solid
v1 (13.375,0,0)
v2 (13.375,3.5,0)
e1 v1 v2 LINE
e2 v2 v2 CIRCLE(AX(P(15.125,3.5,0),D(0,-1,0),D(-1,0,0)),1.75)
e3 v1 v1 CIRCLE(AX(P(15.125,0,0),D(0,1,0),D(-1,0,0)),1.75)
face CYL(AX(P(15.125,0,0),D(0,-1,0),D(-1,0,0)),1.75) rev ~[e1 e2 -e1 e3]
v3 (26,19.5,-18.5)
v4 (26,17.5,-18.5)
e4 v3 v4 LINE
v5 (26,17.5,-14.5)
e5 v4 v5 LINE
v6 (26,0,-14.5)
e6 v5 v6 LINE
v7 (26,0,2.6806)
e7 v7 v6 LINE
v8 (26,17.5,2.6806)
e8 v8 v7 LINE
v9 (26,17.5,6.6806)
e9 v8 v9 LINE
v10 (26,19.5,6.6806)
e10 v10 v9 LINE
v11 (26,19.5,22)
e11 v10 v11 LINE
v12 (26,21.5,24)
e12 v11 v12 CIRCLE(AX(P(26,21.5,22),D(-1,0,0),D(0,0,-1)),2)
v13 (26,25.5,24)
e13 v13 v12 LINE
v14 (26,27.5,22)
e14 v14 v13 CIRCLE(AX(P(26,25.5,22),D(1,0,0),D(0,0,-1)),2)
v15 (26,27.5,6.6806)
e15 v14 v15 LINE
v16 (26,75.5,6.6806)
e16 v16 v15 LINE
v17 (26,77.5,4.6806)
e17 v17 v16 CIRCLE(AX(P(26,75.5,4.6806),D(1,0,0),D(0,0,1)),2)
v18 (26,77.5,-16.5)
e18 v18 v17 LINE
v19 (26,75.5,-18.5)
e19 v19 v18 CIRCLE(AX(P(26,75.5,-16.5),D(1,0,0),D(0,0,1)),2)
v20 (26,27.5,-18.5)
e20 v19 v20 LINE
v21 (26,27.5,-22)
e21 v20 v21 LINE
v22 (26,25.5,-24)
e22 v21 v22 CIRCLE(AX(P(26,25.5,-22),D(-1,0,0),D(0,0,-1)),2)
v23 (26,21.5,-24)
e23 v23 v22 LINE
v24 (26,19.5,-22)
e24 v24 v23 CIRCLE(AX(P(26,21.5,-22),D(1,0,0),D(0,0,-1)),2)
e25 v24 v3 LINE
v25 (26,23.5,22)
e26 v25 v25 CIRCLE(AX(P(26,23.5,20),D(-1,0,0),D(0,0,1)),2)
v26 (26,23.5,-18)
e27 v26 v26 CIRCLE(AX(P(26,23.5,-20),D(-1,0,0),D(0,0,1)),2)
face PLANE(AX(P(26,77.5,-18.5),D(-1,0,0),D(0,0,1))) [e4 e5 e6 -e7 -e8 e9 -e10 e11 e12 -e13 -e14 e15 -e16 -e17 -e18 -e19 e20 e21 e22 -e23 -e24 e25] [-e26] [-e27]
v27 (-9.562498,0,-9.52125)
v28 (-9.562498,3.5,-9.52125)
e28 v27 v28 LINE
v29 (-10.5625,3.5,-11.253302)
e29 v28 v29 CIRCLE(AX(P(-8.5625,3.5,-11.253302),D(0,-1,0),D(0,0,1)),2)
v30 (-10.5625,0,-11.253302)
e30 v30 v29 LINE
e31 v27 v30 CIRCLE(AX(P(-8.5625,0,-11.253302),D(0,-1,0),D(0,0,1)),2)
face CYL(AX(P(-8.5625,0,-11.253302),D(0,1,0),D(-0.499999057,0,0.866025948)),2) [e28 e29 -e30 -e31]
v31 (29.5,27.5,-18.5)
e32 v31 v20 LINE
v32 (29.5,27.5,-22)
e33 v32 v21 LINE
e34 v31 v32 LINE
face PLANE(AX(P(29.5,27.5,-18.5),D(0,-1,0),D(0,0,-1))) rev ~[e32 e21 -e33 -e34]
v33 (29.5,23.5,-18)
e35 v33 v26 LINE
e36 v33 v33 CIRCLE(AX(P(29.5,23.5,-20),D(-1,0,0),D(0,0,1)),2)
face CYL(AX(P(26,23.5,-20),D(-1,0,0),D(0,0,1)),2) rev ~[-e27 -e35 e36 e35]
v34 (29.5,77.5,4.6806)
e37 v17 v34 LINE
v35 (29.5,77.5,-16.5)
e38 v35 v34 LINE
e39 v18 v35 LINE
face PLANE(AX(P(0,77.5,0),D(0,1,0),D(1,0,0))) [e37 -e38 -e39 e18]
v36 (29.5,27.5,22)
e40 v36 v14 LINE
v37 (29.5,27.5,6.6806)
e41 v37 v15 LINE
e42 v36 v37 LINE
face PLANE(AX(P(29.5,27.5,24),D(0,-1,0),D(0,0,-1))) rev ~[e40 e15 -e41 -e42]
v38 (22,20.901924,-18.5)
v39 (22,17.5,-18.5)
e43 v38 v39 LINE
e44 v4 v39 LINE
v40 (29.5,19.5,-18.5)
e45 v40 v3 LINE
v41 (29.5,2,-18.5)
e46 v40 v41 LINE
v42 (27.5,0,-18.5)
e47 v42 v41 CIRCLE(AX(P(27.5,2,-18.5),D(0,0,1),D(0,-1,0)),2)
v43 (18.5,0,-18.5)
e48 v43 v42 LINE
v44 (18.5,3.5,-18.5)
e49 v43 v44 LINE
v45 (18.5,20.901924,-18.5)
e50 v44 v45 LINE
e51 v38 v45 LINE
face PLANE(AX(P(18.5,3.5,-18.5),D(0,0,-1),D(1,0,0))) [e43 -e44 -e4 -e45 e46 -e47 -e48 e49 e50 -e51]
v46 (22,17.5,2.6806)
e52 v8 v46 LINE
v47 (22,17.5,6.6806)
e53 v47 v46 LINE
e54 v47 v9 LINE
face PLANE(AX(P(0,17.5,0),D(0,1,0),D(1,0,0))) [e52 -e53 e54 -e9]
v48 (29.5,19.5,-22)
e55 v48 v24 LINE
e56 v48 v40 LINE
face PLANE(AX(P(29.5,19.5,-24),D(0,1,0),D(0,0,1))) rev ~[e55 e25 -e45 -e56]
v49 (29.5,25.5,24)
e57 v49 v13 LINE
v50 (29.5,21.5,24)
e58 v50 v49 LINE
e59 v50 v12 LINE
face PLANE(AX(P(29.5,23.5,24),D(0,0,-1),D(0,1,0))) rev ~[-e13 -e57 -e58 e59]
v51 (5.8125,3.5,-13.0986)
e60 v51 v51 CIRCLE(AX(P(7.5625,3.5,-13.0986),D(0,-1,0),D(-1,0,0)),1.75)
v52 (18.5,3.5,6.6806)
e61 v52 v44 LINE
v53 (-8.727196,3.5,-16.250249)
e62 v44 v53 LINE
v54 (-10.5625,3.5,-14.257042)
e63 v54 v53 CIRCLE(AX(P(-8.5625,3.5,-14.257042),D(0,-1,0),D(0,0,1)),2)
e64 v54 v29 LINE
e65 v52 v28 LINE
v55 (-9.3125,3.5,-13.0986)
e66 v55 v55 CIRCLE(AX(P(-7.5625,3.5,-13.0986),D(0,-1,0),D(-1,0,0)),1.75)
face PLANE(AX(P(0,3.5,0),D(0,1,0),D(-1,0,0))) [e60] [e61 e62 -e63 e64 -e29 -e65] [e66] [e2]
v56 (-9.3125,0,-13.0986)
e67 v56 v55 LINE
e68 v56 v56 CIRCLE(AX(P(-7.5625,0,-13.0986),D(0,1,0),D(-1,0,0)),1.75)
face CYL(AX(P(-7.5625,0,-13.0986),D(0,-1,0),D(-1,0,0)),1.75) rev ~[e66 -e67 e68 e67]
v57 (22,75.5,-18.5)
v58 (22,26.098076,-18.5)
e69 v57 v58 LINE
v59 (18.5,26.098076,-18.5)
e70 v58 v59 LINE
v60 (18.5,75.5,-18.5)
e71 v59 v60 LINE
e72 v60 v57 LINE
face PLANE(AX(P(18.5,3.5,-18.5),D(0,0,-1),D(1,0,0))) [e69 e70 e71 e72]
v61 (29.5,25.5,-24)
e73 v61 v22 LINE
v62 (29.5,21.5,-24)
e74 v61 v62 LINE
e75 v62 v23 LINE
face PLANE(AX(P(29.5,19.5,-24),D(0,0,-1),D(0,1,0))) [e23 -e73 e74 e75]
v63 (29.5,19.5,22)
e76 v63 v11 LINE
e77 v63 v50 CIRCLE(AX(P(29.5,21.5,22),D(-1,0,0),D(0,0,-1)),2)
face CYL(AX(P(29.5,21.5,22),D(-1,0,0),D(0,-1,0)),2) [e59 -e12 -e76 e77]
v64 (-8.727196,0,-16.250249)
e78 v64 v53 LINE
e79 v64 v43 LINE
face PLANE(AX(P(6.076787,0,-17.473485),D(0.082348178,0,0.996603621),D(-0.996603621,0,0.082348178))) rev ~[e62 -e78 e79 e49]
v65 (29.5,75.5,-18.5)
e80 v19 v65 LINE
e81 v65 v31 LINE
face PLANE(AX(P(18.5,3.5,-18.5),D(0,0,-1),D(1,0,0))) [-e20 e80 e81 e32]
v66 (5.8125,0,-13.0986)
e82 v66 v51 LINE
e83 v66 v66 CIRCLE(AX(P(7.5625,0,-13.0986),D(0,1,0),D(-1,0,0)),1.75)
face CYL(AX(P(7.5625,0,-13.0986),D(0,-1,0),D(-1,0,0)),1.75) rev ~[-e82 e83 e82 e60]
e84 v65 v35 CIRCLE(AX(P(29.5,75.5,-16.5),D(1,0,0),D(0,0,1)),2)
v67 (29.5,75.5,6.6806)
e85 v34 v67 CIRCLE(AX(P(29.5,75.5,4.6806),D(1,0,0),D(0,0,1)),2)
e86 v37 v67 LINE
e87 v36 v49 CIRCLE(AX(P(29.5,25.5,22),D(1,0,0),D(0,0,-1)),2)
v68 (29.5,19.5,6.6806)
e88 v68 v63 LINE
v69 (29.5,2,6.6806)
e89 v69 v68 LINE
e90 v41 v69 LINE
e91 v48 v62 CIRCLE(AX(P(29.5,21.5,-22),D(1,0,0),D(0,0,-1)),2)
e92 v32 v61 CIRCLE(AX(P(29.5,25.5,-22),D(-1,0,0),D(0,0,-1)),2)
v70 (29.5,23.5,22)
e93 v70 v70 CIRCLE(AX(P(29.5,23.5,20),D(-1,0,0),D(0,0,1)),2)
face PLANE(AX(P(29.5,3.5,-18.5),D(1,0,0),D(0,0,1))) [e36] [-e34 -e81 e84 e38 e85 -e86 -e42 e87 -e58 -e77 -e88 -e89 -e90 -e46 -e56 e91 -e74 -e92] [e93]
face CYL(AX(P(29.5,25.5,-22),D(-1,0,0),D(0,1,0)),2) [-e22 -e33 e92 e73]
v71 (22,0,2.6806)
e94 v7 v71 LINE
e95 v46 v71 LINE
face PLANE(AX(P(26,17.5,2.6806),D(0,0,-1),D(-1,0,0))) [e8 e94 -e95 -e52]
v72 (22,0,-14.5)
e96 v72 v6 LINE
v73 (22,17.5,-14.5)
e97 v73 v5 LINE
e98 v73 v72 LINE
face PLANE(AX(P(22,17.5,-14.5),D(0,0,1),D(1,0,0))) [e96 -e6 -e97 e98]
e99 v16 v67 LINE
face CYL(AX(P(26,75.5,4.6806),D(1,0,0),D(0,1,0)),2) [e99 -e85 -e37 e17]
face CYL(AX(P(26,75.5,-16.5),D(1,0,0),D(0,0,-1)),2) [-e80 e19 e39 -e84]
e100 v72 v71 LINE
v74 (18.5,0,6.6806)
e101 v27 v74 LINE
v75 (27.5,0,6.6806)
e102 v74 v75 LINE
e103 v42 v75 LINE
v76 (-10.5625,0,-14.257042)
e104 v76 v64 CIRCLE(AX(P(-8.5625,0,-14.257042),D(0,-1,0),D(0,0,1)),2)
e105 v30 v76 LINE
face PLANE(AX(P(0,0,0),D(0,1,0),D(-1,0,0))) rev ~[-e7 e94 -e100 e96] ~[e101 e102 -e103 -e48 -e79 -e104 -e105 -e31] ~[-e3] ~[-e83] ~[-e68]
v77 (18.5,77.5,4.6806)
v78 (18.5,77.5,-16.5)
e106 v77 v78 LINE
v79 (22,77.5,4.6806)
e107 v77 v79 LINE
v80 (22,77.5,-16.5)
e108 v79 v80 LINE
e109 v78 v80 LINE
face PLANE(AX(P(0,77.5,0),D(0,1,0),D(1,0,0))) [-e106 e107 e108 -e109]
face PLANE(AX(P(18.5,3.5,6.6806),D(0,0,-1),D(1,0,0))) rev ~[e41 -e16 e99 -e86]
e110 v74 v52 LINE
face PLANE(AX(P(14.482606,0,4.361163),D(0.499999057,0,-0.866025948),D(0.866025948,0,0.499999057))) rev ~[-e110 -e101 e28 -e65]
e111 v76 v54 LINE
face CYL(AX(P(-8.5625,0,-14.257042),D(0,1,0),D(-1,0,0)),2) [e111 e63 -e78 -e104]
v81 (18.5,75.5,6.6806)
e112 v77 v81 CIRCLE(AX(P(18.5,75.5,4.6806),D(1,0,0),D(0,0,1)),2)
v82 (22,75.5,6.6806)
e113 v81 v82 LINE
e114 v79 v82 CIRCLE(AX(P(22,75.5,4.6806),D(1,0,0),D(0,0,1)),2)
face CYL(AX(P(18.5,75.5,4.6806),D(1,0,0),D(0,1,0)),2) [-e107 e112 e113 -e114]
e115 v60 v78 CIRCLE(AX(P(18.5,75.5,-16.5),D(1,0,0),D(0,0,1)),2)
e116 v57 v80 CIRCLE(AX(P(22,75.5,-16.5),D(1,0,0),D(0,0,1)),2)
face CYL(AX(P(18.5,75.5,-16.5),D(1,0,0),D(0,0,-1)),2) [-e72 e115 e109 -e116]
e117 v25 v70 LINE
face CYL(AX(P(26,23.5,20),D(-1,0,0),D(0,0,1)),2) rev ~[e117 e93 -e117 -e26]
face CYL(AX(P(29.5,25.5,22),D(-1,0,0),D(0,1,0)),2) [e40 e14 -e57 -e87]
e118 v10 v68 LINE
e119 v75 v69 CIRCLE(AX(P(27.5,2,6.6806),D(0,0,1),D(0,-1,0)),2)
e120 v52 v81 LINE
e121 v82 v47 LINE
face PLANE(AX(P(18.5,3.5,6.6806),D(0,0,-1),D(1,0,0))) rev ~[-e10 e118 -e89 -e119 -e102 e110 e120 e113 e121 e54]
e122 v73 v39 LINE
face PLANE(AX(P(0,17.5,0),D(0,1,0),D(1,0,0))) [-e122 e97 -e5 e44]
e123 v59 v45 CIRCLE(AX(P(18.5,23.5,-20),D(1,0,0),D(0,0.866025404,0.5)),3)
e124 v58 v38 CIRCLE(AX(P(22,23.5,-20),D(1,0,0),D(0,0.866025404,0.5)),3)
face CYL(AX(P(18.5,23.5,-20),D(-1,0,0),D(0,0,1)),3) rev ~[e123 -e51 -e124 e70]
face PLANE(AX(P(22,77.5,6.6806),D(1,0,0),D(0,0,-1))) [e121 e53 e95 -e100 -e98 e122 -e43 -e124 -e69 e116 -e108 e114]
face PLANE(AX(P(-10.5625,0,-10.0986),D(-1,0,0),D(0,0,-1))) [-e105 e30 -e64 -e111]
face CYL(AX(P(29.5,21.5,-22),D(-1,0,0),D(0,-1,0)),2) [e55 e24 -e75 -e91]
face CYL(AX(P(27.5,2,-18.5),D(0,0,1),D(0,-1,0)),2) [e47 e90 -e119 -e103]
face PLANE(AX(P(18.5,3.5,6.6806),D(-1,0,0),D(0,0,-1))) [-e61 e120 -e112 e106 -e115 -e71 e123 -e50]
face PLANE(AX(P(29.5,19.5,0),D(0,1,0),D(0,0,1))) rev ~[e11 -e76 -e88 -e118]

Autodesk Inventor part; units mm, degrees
ref_plane "YZ Plane" through (0, 0, 0) normal (1, 0, 0) x (0, 1, 0)
ref_plane "XZ Plane" through (0, 0, 0) normal (0, 1, 0) x (-1, 0, 0)
ref_plane "XY Plane" through (0, 0, 0) normal (0, 0, 1) x (1, 0, 0)
sketch "Szkic1" plane through (0, 0, 0) normal (0, 1, 0) x (-1, 0, 0)
  circle A0 centre (0, 0) radius 18.5
  circle A1 centre (0, 0) radius 15.125
  line L0 (15.125, 0) -> (7.5625, -13.0986)
  line L1 (7.5625, -13.0986) -> (-7.5625, -13.0986)
  line L2 (-7.5625, -13.0986) -> (-15.125, 0)
  line L3 (-15.125, 0) -> (-7.5625, 13.0986)
  line L4 (-7.5625, 13.0986) -> (7.5625, 13.0986)
  line L5 (7.5625, 13.0986) -> (15.125, 0)
  circle A2 centre (-15.125, 0) radius 1.75
  circle A3 centre (-7.5625, -13.0986) radius 1.75
  circle A4 centre (7.5625, -13.0986) radius 1.75
  line L6 (-18.5, 0) -> (-29.5, 0)
  line L7 (-29.5, 0) -> (-29.5, -18.5)
  line L8 (-29.5, -18.5) -> (-18.5, -18.5)
  line L9 (-18.5, -18.5) -> (-18.5, 0)
  line L10 (-29.5, -18.5) -> (-26, -18.5)
  line L11 (-26, -18.5) -> (-26, 0)
  line L12 (-26, 0) -> (-29.5, 0)
  line L13 (-29.5, 0) -> (-29.5, -18.5)
  line L14 (-26, -18.5) -> (-22, -18.5)
  line L15 (-22, -18.5) -> (-22, 0)
  line L16 (-22, 0) -> (-26, 0)
  line L17 (-26, 0) -> (-26, -18.5)
  line L18 (-18.5, 0) -> (-29.5, 0)
  line L19 (-29.5, 0) -> (-29.5, 15)
  line L20 (7.5625, -13.0986) -> (-18.5, -13.0986)
  line L21 (-18.5, -13.0986) -> (-18.5, -16.0986)
  line L22 (-18.5, -16.0986) -> (7.5625, -16.0986)
  line L23 (7.5625, -16.0986) -> (7.5625, -13.0986)
  line L24 (7.5625, -10.0986) -> (7.5625, -16.0986)
  line L25 (7.5625, -10.0986) -> (-18.5, -10.0986)
  line L26 (-18.5, -10.0986) -> (-18.5, -13.0986)
  line L27 (-18.5, -13.0986) -> (7.5625, -13.0986)
  line L28 (7.5625, -13.0986) -> (7.5625, -10.0986)
  line L29 (7.5625, -10.0986) -> (10.5625, -10.0986)
  line L30 (10.5625, -10.0986) -> (10.5625, -16.0986)
  line L31 (10.5625, -16.0986) -> (7.5625, -16.0986)
  line L32 (7.5625, -16.0986) -> (7.5625, -10.0986)
  line L33 (10.5625, -10.0986) -> (-18.5, 6.6806)
  line L34 (-18.5, -18.5) -> (10.5625, -16.0986)
  line L35 (-18.5, 6.6806) -> (-29.5, 13.0315)
  line L36 (-29.5, 0) -> (-18.5, 0)
  line L37 (-18.5, 0) -> (-18.5, 6.6806)
  line L38 (-18.5, 6.6806) -> (-29.5, 6.6806)
  line L39 (-29.5, 6.6806) -> (-29.5, 0)
  point P0 (-9.3125, -13.0986)
  point P1 (-5.8125, -13.0986)
  point P2 (5.8125, -13.0986)
  point P3 (7.5625, -14.8486)
  dimension "d0" = 37
  dimension "d1" = 30.25
  dimension "d2" = 3.5
  dimension "d3" = 3.5
  dimension "d4" = 3.5
  dimension "d5" = 11
  dimension "d6" = 3.5
  dimension "d7" = 4
  dimension "d9" = 3
  dimension "d10" = 3
  dimension "d12" = 3
  dimension "d13" = 30
extrude "Wyciągnięcie proste1" add sketch "Szkic1" along normal blind 3.5 contours L33 A1 A2 L25 A0 | A0 L37 L33 | L30 L31 A0 | A0 L31 L23 A4 A1 L30 | L9 L8 L15 L6 | A0 L25 L9 | L6 L19 L38 L37 | L33 L3 A2 A1 | L31 L34 A0 | A0 L34 L22 L31 | A1 A4 L0 L29 L30 | L25 A1 A3 L20 A0 | A0 L20 L9 L25 | L15 L8 L11 L6 | L33 L0 L29 L25 L2 A2 L3 | L22 A0 L20 A3 A1 A4 L23 | L29 L0 L33 | A0 L22 L9 L20 | L25 L2 A3 A1 | A1 A2 L2 L25 | L11 L8 L7 L6 | L34 L9 L22 A0 | A4 L24 L29 L0 | L25 L24 A4 L1 A3 L2 | A1 A3 L1 A4
sketch "Szkic2" plane through (0, 3.5, 0) normal (0, 1, 0) x (1, 0, 0)
  line L0 (18.5, -6.6806) -> (29.5, -6.6806) projected
  line L1 (18.5, 18.5) -> (-10.5625, 16.0986) projected
  line L2 (29.5, -6.6806) -> (18.5, -6.6806)
  line L3 (18.5, -6.6806) -> (18.5, 18.5)
  line L4 (18.5, 18.5) -> (29.5, 18.5)
  line L5 (29.5, 18.5) -> (29.5, -6.6806)
  point P0 (0, 0)
extrude "Wyciągnięcie proste2" add sketch "Szkic2" along normal blind 74
sketch "Szkic3" plane through (0, 77.5, 0) normal (0, 1, 0) x (1, 0, 0)
  line L0 (18.5, -6.6806) -> (29.5, -6.6806) projected
  line L1 (29.5, 18.5) -> (18.5, 18.5) projected
  line L2 (26, -6.6806) -> (22, -6.6806)
  line L3 (22, -6.6806) -> (22, 18.5)
  line L4 (22, 18.5) -> (26, 18.5)
  line L5 (26, 18.5) -> (26, -6.6806)
  line L6 (18.5, 18.5) -> (18.5, -6.6806) projected
  point P0 (0, 0)
  dimension "d21" = 4
  dimension "d22" = 3.5
extrude "Wyciągnięcie proste3" cut sketch "Szkic3" against normal blind 60 contours L3 L1 L5 L0
sketch "Szkic4" plane through (0, 17.5, 0) normal (0, 1, 0) x (1, 0, 0)
  line L0 (26, 18.5) -> (26, -6.6806) projected
  line L1 (22, -6.6806) -> (22, 18.5) projected
  line L2 (22, 0) -> (22, 11.8194)
  line L3 (26, 11.8194) -> (26, 0)
  line L4 (26, -6.6806) -> (22, -6.6806) projected
  line L5 (22, 18.5) -> (26, 18.5) projected
  line L6 (22, 14.5) -> (26, 14.5)
  line L7 (26, 14.5) -> (26, -2.6806)
  line L8 (26, -2.6806) -> (22, -2.6806)
  line L9 (22, -2.6806) -> (22, 14.5)
  point P0 (0, 0)
  dimension "d29" = 4
  dimension "d30" = 4
extrude "Wyciągnięcie proste4" cut sketch "Szkic4" against normal blind 60 contours L0 L8 L1 L6
sketch "Szkic8" plane through (29.5, 0, 6.6806) normal (1, 0, 0) x (0, 0, -1)
  line L0 (-17, 23.5) -> (25.1806, 23.5)
  line L1 (25.1806, 0) -> (25.1806, 77.5) projected
  line L2 (6.6806, 0) -> (6.6806, 23.5)
  line L3 (6.6806, 18.5) -> (30.6806, 18.5)
  line L4 (30.6806, 18.5) -> (30.6806, 28.5)
  line L5 (30.6806, 28.5) -> (6.6806, 28.5)
  line L6 (6.6806, 28.5) -> (6.6806, 18.5)
  line L7 (6.6806, 18.5) -> (-17.3194, 18.5)
  line L8 (-17.3194, 18.5) -> (-17.3194, 28.5)
  line L9 (-17.3194, 28.5) -> (6.6806, 28.5)
  line L10 (6.6806, 28.5) -> (6.6806, 18.5)
  line L11 (30.6806, 23.5) -> (-17.3194, 23.5)
  line L12 (30.6806, 19.5) -> (-17.3194, 19.5)
  line L13 (-17.3194, 19.5) -> (-17.3194, 27.5)
  line L14 (-17.3194, 27.5) -> (30.6806, 27.5)
  line L15 (30.6806, 27.5) -> (30.6806, 19.5)
  point P0 (25.1806, 28.5)
  point P1 (25.1806, 18.5)
  point P2 (25.1806, 27.5)
  point P3 (25.1806, 19.5)
  point P4 (6.6806, 27.5)
  point P5 (6.6806, 19.5)
  dimension "d39" = 24
  dimension "d40" = 24
  dimension "d47" = 1
  dimension "d48" = 1
extrude "Wyciągnięcie proste6" add sketch "Szkic8" against normal blind 3.5 contours L11 L8 L14 L6 L0 | L0 L2 L12 L8 L11 | L11 L4 L12 L1 | L1 L14 L4 L11
sketch "Szkic9" plane through (26, 77.5, -18.5) normal (-1, 0, 0) x (0, 0, 1)
  line L0 (42.5, -58) -> (42.5, -50) projected
  line L1 (42.5, -54) -> (38.5, -54)
  circle A0 centre (38.5, -54) radius 2
  line L2 (-5.5, -50) -> (-5.5, -58) projected
  line L3 (-5.5, -54) -> (-1.5, -54)
  circle A1 centre (-1.5, -54) radius 2
  point P0 (18.5, -77.5)
  point P1 (42.5, -59)
  point P2 (42.5, -49)
  point P3 (-5.5, -49)
  point P4 (-5.5, -59)
  dimension "d43" = 4
  dimension "d44" = 4
  dimension "d45" = 4
  dimension "d46" = 4
extrude "Wyciągnięcie proste7" cut sketch "Szkic9" along normal mid plane 50
fillet "Zaokrąglenie3" radius 2 11 edges at (-10.5625, 1.75, -16.0986) (-10.5625, 1.75, -10.0986) (29.5, 0, -5.9097) (27.75, 19.5, 24) (27.75, 27.5, 24) (27.75, 19.5, -24) (27.75, 27.5, -24) (27.75, 77.5, -18.5) (27.75, 77.5, 6.6806) (20.25, 77.5, 6.6806) (20.25, 77.5, -18.5)
sketch "Szkic10" plane through (18.5, 3.5, -18.5) normal (-1, 0, 0) x (0, 0, 1)
  circle A0 centre (-1.5, 20) radius 2 projected
  circle A1 centre (-1.5, 20) radius 3
  point P0 (18.5, -3.5)
  dimension "d52" = 6
extrude "Wyciągnięcie proste8" cut sketch "Szkic10" against normal blind 4 contours A0 | A1
sketch "Szkic11" plane through (29.5, 21.5, 24) normal (1, 0, 0) x (0, 0, -1)
  circle A0 centre (44, 2) radius 2 projected
  line L0 (4.0189, 2) -> (44, 2)
  point P0 (24, -21.5)
  dimension "d55" = 39.9811
properties part number "nasilnikprzod1_new"
